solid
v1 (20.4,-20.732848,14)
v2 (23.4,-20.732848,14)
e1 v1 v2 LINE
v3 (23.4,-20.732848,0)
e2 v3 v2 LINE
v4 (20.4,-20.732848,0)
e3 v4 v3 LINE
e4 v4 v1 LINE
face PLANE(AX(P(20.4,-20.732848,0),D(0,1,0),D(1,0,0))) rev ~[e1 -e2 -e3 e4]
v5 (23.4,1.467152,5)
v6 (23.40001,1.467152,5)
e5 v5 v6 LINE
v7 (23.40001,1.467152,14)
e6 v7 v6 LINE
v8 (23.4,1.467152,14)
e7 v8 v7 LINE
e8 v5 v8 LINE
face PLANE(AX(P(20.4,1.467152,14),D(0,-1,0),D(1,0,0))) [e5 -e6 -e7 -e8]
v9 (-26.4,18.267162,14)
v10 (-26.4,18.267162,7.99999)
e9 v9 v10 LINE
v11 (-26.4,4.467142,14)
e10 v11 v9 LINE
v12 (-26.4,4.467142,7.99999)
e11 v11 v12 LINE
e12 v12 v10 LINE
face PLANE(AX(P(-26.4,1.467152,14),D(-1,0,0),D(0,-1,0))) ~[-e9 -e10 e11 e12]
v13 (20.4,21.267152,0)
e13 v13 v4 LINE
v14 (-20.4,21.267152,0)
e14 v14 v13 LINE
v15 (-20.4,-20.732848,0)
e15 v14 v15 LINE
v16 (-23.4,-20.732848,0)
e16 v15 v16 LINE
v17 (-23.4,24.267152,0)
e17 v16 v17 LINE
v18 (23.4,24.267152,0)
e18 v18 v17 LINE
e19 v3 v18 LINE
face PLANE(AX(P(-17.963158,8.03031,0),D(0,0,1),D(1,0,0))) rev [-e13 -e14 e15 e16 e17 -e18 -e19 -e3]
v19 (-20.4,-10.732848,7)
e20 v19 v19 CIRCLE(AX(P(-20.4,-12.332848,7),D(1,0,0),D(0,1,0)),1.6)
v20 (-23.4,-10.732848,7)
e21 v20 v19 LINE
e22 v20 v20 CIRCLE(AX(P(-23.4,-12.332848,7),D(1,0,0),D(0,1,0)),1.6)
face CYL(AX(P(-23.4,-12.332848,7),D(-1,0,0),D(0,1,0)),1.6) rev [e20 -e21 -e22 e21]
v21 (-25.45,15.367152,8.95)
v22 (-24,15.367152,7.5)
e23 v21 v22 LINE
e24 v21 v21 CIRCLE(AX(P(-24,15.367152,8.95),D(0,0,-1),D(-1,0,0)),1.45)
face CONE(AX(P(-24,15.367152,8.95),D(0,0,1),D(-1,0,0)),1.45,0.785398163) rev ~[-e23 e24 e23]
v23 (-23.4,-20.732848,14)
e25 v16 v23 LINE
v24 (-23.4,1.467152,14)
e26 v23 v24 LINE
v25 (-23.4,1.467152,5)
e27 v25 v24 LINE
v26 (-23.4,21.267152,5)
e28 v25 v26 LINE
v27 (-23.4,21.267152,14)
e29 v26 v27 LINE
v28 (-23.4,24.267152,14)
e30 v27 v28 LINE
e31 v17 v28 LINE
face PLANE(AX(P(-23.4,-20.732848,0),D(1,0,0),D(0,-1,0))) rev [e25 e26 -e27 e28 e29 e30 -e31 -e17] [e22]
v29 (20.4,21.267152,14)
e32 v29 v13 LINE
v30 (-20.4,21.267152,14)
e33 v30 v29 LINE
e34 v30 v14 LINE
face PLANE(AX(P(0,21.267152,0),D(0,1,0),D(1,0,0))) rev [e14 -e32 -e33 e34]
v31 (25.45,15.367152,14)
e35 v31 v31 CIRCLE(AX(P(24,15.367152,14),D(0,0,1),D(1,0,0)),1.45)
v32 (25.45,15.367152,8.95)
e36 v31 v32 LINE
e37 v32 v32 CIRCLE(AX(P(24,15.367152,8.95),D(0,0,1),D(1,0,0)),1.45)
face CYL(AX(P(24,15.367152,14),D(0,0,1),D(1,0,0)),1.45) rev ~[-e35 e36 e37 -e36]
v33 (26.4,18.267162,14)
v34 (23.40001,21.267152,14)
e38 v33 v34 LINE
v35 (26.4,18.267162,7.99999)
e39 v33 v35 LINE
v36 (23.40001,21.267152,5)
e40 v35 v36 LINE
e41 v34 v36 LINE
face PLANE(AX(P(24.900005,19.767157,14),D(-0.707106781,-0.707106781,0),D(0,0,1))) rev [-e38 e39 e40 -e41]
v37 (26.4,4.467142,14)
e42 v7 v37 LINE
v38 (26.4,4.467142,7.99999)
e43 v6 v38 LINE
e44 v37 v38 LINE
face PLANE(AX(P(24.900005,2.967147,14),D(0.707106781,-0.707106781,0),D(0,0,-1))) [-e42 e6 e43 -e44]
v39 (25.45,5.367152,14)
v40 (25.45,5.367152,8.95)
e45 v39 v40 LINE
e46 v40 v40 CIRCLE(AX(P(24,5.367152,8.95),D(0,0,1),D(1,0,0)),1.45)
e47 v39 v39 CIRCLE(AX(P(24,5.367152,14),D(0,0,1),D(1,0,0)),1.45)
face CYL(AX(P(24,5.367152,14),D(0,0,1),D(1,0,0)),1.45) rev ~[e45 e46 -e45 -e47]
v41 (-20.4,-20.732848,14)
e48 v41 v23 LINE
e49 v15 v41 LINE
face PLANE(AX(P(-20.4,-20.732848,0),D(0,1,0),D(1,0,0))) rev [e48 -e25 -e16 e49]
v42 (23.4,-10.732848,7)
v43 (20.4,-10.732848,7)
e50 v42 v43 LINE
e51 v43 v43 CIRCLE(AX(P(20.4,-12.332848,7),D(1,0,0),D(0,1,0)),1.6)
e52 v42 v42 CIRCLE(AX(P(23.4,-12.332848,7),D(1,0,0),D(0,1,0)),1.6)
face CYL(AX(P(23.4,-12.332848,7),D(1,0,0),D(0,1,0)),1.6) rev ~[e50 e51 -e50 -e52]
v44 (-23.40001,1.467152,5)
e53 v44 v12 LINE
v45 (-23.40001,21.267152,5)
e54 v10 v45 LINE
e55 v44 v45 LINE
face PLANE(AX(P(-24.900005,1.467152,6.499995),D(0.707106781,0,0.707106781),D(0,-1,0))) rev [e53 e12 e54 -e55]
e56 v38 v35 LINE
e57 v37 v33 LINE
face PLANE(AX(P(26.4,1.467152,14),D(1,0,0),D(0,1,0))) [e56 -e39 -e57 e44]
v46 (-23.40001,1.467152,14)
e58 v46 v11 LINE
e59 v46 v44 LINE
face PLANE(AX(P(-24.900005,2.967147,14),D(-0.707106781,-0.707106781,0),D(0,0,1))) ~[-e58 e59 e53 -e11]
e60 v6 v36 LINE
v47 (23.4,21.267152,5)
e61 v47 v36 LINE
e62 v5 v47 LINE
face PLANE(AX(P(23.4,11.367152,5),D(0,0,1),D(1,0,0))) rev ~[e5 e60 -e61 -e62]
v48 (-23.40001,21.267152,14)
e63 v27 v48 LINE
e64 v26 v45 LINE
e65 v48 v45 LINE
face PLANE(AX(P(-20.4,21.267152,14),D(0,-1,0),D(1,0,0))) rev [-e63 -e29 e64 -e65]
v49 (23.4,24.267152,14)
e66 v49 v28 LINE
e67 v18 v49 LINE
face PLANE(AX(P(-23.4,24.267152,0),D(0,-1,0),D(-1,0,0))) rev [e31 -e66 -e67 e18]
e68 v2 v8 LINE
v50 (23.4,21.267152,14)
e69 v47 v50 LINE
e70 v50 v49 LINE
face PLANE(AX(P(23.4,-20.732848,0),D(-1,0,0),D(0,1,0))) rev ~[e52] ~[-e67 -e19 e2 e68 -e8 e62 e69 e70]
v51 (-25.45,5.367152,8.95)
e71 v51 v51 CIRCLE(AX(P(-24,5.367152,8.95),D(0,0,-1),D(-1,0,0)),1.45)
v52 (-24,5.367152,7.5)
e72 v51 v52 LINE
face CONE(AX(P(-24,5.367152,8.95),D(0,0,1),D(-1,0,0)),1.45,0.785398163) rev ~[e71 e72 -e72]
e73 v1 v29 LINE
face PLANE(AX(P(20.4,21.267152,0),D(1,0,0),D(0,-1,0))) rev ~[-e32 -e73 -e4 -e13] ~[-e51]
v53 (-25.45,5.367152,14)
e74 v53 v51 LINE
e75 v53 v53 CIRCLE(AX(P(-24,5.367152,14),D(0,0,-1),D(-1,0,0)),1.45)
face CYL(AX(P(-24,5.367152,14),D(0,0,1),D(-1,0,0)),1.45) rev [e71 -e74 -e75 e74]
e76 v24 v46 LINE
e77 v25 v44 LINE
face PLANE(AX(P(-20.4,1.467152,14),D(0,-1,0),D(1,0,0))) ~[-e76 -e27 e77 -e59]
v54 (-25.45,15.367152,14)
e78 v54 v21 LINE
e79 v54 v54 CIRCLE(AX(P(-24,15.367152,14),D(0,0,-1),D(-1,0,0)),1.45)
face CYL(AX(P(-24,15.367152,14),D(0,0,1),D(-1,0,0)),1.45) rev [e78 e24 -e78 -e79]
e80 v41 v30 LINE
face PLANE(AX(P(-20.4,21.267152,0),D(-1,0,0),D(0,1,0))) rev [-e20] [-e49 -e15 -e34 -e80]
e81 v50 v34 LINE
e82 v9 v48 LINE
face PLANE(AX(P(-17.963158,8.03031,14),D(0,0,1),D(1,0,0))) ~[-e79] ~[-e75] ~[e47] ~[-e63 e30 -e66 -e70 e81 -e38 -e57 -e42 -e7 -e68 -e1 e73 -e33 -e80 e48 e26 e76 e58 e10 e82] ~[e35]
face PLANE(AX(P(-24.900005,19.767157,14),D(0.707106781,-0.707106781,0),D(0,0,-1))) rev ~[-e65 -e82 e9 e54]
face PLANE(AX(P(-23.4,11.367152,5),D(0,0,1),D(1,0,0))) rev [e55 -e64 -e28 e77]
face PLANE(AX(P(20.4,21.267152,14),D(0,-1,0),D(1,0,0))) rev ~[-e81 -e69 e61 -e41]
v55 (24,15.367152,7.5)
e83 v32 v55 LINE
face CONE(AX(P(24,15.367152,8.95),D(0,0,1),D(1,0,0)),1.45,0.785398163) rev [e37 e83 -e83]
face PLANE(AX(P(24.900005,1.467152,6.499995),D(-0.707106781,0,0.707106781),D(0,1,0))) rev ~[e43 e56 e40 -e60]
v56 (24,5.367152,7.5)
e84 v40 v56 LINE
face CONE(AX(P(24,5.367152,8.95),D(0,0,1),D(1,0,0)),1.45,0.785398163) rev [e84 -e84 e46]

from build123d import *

# Parameters (mm, degrees)
F1_DEPTH = 14
F2_W     = 6
F2_H     = 19.8
F3_DEPTH = 9
F4_R     = 1.45
F5_DEPTH = 6.5
F6_SIZE  = 2.99999
F7_R     = 1.6
F8_DEPTH = 3
F10_SIZE = 1.45


# Not quite as in the source:
# - a fillet or chamfer is up to 0.001 mm smaller than in the source, because OpenCascade refuses the exact size


with BuildPart() as f1:
    # F0 (on Top) → F1 (new body)
    with BuildSketch(Plane.XY):
        Polygon((0, 24.2671520197), (0, 21.2671520197), (20.4, 21.2671520197), (20.4, -20.7328479803), (23.4, -20.7328479803), (23.4, 24.2671520197), align=None)
    extrude(amount=F1_DEPTH)

    # F2 (on face) → F3 (join)
    with BuildSketch(Plane.XY.offset(14)):
        with Locations((23.4, 11.3671520197)):
            Rectangle(F2_W, F2_H)
    extrude(amount=-F3_DEPTH)

    # F4 (on face) → F5 (cut)
    with BuildSketch(Plane.XY.offset(14)):
        with Locations((24, 5.3671520197)):
            Circle(F4_R)
        with Locations((24, 15.3671520197)):
            Circle(F4_R)
    extrude(amount=-F5_DEPTH, mode=Mode.SUBTRACT)

    # F6 (size 3 in the source; OpenCascade refuses exactly that, so slightly less here)
    f6_edges = [f1.edges().sort_by_distance(p)[0] for p in [
        (26.4, 1.467152, 9.5),
        (26.4, 21.267152, 9.5),
        (26.4, 11.367152, 5),
    ]]
    chamfer(f6_edges, length=F6_SIZE)

    # F7 (on face) → F8 (cut, through all)
    with BuildSketch(Plane.YZ.offset(23.4)):
        with Locations((-12.3328479803, 7)):
            Circle(F7_R)
    extrude(amount=-F8_DEPTH, mode=Mode.SUBTRACT)

    # F9: F1 across plane


with BuildPart() as f1_1:
    add(f1.part)
    add(f1.part.mirror(Plane.YZ))

    # F10
    f10_edges = [f1_1.edges().sort_by_distance(p)[0] for p in [
        (22.55, 15.367152, 7.5),
        (22.55, 5.367152, 7.5),
        (-22.55, 5.367152, 7.5),
        (-22.55, 15.367152, 7.5),
    ]]
    chamfer(f10_edges, length=F10_SIZE)


solid = f1_1.part
